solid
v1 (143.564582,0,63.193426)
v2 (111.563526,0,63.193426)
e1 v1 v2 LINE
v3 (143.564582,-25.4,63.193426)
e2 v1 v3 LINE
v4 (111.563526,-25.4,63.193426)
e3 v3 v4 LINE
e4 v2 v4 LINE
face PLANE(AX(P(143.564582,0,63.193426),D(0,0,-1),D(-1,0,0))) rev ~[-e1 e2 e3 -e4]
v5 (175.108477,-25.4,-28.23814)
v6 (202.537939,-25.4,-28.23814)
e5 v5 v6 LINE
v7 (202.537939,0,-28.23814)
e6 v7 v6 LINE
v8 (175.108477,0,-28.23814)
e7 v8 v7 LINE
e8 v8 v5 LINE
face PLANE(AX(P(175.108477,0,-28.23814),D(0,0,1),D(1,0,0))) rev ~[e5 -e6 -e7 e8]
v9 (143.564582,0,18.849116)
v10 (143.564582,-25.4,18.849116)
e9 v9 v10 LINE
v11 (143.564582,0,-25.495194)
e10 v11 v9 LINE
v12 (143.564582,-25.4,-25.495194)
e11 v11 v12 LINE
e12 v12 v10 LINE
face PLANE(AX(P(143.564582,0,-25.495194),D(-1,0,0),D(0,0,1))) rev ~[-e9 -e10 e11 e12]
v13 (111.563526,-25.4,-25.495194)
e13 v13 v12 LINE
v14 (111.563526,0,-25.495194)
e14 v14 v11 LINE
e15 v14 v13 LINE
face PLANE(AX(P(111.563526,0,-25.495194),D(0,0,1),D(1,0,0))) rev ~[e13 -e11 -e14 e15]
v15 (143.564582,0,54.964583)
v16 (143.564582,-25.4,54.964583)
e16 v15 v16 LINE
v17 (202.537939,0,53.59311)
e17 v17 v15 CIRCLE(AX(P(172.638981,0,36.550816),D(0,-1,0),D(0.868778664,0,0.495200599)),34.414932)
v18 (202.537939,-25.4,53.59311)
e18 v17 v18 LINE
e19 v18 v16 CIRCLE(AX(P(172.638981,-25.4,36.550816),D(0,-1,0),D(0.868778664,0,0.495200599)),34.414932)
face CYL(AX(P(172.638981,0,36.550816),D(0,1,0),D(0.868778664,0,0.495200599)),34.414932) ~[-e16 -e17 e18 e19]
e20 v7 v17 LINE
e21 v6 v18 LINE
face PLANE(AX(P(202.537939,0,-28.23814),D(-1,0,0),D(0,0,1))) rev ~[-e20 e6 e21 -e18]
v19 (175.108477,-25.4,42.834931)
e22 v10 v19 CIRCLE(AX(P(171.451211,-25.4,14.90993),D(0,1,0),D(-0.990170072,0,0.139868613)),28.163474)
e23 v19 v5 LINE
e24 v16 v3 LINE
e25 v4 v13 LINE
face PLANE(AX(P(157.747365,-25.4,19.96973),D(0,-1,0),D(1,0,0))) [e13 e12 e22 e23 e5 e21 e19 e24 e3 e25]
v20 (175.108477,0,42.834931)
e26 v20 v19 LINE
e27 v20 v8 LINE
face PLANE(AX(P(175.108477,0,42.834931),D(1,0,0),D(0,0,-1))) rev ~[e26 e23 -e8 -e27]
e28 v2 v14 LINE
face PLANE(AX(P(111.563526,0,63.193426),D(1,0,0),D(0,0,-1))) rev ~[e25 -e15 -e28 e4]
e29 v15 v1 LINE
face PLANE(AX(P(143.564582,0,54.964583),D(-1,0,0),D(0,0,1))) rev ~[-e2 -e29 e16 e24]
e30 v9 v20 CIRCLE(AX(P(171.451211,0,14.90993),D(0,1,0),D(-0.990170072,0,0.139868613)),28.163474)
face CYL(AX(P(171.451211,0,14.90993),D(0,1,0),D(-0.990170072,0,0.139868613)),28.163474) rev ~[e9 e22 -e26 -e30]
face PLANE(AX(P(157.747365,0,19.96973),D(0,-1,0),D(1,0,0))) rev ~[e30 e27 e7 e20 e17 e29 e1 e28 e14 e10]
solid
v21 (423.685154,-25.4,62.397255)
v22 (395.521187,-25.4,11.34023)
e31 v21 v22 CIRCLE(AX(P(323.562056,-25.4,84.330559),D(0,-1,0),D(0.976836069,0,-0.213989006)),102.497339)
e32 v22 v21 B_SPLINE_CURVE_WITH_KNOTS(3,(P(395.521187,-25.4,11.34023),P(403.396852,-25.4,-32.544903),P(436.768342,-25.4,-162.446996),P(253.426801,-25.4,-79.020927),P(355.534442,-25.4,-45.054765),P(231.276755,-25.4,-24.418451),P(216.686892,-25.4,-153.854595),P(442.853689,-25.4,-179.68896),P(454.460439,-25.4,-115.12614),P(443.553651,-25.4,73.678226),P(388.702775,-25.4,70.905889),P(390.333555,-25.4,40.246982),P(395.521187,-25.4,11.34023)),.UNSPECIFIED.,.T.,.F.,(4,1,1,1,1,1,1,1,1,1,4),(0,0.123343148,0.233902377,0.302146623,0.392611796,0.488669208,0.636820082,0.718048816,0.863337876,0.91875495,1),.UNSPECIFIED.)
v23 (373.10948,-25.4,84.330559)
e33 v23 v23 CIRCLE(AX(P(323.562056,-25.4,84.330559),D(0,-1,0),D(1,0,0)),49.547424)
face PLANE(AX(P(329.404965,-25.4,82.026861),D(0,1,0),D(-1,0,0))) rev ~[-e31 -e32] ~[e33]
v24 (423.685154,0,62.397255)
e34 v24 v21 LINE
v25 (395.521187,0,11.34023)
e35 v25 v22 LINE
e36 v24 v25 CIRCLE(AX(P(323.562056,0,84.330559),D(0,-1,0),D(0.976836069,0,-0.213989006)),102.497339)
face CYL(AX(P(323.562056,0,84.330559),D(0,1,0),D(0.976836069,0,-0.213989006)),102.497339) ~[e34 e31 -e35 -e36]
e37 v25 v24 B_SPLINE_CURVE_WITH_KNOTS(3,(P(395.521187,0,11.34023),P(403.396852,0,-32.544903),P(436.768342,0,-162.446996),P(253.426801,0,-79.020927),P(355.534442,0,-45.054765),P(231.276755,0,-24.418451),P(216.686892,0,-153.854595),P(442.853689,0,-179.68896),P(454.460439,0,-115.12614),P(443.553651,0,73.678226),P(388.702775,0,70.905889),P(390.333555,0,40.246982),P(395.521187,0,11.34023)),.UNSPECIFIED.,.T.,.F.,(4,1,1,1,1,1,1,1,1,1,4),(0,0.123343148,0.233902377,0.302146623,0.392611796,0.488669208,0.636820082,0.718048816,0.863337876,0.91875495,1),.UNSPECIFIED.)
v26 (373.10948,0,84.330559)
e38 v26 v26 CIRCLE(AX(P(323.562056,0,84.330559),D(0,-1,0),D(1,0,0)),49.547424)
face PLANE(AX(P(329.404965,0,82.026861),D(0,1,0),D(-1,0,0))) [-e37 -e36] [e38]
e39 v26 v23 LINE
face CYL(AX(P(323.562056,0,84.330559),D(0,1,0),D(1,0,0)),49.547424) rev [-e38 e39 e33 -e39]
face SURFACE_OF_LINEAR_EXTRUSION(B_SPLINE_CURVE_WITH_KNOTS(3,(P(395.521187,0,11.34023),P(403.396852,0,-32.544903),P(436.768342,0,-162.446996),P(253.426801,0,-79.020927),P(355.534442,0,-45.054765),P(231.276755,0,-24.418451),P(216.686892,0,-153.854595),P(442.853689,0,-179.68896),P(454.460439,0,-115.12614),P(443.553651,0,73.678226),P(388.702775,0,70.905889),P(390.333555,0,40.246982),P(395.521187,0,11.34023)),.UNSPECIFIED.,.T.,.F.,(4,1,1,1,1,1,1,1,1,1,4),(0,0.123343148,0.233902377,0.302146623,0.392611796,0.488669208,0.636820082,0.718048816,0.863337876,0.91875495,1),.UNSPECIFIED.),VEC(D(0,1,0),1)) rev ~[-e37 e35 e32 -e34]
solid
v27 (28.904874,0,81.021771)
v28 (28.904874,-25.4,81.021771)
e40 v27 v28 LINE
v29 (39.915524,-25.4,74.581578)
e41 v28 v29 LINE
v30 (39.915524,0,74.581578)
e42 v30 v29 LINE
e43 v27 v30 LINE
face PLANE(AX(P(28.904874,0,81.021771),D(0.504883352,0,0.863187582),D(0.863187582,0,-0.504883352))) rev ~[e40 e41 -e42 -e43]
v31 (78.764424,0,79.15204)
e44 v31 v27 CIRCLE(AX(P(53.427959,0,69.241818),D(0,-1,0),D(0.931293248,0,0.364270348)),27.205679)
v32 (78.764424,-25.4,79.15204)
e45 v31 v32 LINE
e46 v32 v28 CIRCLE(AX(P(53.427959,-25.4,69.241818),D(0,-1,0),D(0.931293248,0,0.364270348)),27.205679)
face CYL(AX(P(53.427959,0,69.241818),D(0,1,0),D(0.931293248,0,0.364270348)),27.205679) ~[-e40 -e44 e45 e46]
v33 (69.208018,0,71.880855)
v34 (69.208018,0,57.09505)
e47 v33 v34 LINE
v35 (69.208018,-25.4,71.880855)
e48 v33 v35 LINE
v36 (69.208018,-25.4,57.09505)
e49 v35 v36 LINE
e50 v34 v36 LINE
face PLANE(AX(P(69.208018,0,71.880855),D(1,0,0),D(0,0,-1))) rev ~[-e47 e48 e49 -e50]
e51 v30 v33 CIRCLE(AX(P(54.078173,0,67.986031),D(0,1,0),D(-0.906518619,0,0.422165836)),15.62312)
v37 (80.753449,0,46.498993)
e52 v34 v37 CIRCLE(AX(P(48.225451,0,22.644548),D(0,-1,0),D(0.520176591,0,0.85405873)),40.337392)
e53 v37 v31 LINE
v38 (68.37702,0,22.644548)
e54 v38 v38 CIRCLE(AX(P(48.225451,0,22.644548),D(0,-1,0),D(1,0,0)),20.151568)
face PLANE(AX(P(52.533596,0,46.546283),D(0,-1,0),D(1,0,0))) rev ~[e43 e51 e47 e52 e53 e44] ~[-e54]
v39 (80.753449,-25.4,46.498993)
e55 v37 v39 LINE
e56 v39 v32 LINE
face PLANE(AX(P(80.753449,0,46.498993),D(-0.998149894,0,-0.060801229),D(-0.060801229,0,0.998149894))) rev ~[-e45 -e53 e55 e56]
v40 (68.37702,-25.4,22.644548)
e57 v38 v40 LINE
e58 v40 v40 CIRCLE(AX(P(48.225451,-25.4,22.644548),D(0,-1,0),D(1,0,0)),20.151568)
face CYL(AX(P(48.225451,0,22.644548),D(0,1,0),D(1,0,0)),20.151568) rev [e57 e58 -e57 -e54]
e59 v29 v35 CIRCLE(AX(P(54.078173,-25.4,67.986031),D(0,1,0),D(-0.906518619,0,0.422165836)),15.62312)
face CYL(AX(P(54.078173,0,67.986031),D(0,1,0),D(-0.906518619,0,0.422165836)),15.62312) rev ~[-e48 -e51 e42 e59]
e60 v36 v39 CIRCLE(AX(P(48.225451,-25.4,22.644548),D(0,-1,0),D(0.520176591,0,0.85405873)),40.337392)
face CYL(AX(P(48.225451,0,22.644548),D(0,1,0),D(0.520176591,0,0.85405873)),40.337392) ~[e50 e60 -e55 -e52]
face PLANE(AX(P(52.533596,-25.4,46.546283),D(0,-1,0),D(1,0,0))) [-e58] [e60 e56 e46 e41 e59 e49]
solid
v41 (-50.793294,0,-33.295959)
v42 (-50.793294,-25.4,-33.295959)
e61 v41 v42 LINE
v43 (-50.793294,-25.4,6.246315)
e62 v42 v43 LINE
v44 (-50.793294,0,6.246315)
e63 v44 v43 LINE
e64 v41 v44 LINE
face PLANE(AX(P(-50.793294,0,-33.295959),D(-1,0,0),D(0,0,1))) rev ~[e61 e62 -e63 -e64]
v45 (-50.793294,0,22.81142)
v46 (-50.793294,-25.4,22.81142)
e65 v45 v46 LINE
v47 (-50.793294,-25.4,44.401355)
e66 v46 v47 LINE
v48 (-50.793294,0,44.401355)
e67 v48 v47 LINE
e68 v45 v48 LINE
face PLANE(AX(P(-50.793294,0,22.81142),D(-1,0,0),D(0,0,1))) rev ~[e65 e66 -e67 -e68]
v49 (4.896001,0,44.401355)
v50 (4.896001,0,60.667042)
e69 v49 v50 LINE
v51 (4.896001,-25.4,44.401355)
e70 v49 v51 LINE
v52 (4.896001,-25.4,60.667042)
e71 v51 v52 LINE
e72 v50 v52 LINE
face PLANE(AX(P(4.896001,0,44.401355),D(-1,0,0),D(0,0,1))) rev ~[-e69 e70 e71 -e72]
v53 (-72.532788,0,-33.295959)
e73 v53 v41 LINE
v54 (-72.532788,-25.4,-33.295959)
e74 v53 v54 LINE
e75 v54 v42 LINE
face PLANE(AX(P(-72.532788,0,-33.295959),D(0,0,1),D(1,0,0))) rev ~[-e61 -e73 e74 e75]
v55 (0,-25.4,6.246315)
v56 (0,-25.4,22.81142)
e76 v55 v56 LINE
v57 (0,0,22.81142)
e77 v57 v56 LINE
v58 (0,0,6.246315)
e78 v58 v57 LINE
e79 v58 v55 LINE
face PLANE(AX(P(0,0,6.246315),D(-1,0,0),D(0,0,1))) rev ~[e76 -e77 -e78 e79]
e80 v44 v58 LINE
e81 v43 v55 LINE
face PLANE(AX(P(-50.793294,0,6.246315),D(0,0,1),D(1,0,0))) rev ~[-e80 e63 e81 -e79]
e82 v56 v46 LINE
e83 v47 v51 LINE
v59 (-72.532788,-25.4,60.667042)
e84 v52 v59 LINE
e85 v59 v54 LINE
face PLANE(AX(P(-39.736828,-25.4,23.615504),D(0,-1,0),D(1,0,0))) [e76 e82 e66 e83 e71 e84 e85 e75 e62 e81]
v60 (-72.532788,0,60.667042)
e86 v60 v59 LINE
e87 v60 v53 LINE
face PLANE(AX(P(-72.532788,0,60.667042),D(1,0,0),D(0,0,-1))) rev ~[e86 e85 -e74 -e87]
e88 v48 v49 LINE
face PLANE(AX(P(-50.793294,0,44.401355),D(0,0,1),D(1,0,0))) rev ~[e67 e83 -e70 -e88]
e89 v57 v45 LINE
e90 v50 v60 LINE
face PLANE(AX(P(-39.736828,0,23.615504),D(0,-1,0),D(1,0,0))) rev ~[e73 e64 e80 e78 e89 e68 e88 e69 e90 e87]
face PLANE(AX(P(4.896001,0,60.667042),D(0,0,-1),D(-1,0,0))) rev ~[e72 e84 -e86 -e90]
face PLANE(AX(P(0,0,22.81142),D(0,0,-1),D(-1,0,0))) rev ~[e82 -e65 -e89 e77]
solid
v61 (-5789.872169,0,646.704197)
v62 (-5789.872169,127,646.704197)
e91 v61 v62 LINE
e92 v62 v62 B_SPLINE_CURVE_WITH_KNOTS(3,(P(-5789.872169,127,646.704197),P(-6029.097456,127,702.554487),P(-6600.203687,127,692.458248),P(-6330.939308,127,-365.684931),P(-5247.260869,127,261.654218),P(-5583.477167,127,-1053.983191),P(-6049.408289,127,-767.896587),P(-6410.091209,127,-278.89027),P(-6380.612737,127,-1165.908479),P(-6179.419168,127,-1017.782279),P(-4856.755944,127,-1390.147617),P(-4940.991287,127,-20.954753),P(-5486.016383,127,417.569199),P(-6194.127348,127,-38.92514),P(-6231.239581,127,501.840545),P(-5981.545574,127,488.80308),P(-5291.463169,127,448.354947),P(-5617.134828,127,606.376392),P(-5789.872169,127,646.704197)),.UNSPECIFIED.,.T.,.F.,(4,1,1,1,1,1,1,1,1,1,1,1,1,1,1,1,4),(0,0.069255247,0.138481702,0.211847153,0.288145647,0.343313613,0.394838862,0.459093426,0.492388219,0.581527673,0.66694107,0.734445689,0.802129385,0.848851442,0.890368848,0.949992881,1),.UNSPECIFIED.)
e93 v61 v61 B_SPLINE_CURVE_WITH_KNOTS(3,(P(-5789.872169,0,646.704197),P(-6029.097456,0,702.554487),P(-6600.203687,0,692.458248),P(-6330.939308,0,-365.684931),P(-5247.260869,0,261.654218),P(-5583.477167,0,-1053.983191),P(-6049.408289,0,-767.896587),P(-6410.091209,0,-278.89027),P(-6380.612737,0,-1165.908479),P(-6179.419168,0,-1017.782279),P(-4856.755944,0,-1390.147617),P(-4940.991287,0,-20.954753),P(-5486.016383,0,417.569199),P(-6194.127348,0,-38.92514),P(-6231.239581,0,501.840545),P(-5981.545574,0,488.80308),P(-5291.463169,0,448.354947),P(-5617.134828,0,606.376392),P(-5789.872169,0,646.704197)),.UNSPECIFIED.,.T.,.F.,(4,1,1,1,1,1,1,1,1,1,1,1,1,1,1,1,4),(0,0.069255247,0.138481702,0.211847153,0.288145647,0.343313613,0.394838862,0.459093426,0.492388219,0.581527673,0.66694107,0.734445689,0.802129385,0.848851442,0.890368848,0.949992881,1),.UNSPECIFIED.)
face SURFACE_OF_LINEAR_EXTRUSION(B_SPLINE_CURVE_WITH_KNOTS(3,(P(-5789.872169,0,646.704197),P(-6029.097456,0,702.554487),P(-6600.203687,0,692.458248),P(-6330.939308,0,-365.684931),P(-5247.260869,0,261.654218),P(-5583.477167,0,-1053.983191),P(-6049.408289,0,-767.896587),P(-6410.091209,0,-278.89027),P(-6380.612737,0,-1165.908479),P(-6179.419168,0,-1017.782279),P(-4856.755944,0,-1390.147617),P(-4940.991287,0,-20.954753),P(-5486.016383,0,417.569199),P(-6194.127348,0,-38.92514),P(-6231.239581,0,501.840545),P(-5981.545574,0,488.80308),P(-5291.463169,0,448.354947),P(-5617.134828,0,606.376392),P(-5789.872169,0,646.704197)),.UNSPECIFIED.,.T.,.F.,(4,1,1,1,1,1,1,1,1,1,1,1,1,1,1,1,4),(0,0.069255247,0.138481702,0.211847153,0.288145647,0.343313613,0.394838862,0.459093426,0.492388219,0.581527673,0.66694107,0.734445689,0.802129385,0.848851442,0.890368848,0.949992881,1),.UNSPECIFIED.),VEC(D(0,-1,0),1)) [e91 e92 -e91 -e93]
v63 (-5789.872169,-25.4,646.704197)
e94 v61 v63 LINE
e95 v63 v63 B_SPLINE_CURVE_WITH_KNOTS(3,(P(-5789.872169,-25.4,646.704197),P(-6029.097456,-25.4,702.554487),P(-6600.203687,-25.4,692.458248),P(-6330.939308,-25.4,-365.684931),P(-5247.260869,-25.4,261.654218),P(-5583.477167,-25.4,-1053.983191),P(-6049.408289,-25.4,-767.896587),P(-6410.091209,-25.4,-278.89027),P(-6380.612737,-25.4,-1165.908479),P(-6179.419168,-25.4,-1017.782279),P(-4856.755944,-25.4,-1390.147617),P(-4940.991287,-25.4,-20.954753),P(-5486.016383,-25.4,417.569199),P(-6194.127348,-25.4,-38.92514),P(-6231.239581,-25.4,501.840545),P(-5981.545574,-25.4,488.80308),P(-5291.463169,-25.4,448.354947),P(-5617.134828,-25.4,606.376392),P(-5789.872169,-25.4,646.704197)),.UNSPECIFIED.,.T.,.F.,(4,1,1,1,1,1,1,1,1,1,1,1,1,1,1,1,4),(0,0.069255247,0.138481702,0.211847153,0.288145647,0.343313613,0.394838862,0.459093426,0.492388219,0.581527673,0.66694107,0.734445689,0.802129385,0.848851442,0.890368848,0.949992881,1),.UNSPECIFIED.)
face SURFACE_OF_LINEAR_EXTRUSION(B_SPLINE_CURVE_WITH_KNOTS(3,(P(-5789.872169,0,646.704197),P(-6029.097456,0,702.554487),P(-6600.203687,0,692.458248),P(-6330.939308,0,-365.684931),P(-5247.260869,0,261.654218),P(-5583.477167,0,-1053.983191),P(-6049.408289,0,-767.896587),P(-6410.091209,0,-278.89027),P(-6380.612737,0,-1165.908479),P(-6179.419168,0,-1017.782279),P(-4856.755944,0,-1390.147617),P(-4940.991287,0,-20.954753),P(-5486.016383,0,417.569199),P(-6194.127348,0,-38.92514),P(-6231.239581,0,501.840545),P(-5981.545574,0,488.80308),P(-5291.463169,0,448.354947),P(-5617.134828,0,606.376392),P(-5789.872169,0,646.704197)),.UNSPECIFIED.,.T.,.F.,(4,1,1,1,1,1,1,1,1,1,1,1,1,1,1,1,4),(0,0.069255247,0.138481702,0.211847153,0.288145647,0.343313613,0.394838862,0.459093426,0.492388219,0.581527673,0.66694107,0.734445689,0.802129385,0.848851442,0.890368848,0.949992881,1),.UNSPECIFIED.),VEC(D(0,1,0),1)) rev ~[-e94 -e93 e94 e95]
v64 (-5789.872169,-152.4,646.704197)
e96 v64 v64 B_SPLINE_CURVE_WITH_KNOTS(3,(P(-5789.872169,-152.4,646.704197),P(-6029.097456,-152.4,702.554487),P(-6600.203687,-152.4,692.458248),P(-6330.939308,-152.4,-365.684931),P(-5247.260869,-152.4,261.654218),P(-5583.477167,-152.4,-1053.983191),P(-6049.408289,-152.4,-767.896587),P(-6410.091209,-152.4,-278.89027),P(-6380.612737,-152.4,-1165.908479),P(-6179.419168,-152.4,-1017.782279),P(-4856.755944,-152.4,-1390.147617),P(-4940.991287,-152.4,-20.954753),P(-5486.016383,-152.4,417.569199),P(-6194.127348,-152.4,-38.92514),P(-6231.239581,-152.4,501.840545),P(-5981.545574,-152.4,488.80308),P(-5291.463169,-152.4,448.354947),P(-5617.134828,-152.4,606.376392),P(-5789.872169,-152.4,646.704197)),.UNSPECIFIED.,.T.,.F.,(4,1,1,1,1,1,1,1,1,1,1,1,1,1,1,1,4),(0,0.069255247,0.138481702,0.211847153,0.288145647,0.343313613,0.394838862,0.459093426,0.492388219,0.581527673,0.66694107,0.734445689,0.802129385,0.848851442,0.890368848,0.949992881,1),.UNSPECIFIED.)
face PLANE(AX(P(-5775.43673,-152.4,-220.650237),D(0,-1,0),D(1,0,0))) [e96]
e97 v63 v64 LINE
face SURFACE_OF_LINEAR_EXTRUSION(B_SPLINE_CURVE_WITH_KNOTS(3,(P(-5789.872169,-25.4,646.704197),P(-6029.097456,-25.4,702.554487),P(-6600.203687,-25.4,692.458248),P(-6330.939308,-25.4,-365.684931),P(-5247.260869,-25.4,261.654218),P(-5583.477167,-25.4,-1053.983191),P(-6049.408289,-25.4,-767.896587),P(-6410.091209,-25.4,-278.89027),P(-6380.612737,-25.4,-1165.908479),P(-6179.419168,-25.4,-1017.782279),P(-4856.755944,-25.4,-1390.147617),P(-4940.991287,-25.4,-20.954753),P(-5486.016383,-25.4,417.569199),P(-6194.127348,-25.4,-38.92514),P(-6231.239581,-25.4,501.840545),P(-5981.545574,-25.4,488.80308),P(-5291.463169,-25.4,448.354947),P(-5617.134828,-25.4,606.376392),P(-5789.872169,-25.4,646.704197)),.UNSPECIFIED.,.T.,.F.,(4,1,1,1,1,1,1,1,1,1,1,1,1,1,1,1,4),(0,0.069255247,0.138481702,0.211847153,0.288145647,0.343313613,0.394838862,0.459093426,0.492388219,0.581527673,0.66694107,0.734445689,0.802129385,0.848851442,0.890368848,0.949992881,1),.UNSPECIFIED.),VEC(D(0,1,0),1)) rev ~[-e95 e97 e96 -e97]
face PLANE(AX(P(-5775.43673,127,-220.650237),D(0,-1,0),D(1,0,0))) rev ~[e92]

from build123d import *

# Parameters (mm, degrees)
F1_DEPTH  = 25.4
F2_R      = 20.1515683271
F3_DEPTH  = 25.4
F5_DEPTH  = 25.4
F6_R      = 49.5474241776
F7_DEPTH  = 25.4
F9_DEPTH  = 25.4
F10_DEPTH = 127
F11_DEPTH = 127


with BuildPart() as f1:
    # F0 (on Front) → F1 (new body)
    with BuildSketch(Plane.XZ):
        Polygon((4.896000959, 60.6670416892), (-50.7932938635, 60.6670416892), (-72.532787919, 60.6670416892), (-72.532787919, -33.2959592342), (-50.7932938635, -33.2959592342), (-50.7932938635, 6.2463153154), (0, 6.2463153154), (0, 22.8114202619), (-50.7932938635, 22.8114202619), (-50.7932938635, 44.4013550878), (4.896000959, 44.4013550878), align=None)
    extrude(amount=F1_DEPTH)


with BuildPart() as f3:
    # F2 (on Front) → F3 (new body)
    with BuildSketch(Plane.XZ):
        with BuildLine():
            Line((69.2080184817, 71.8808546662), (69.2080184817, 57.0950497716))
            ThreePointArc((69.2080184817, 57.0950497716), (20.9506599051, -7.0739813824), (80.7534490159, 46.4989934334))
            Line((80.7534490159, 46.4989934334), (78.764423728, 79.1520401835))
            ThreePointArc((78.764423728, 79.1520401835), (54.4474535963, 96.4283882368), (28.9048738778, 81.0217708349))
            Line((28.9048738778, 81.0217708349), (39.9155244231, 74.5815783739))
            ThreePointArc((39.9155244231, 74.5815783739), (55.5125178382, 83.5431683785), (69.2080184817, 71.8808546662))
        make_face()
        with Locations((48.2254512608, 22.6445477456)):
            Circle(F2_R, mode=Mode.SUBTRACT)
    extrude(amount=F3_DEPTH)


with BuildPart() as f5:
    # F4 (on Front) → F5 (new body)
    with BuildSketch(Plane.XZ):
        with BuildLine():
            Line((143.564581871, 63.1934255362), (111.563526094, 63.1934255362))
            Line((111.563526094, 63.1934255362), (111.563526094, -25.4951938987))
            Line((111.563526094, -25.4951938987), (143.564581871, -25.4951938987))
            Line((143.564581871, -25.4951938987), (143.564581871, 18.8491158187))
            ThreePointArc((143.564581871, 18.8491158187), (154.4043540585, 37.3283583229), (175.1084774733, 42.834930599))
            Line((175.1084774733, 42.834930599), (175.1084774733, -28.2381400466))
            Line((175.1084774733, -28.2381400466), (202.5379389524, -28.2381400466))
            Line((202.5379389524, -28.2381400466), (202.5379389524, 53.5931102931))
            ThreePointArc((202.5379389524, 53.5931102931), (173.4391114232, 70.9564445373), (143.564581871, 54.9645833671))
            Line((143.564581871, 54.9645833671), (143.564581871, 63.1934255362))
        make_face()
    extrude(amount=F5_DEPTH)


with BuildPart() as f7:
    # F6 (on Front) → F7 (new body)
    with BuildSketch(Plane.XZ):
        with BuildLine():
            add(Edge.make_bspline(
                [(423.6851538527, 62.3972549785), (415.2890698824, 72.249644405), (388.7027752218, 70.9058885795), (390.3335545605, 40.2469822597), (395.5211865422, 11.3402300988)],
                knots=[0.863337876, 0.863337876, 0.863337876, 0.863337876, 0.9187549499, 1, 1, 1, 1], degree=3))
            ThreePointArc((423.6851538527, 62.3972549785), (233.8136390734, 133.8373892581), (395.5211865422, 11.3402300988))
        make_face()
        with Locations((323.5620558262, 84.3305587769)):
            Circle(F6_R, mode=Mode.SUBTRACT)
        with BuildLine():
            add(Edge.make_bspline(
                [(395.5211865422, 11.3402300988), (403.3968523027, -32.5449026633), (436.7683420202, -162.4469960687), (253.4268012825, -79.0209266907), (355.534441953, -45.0547650507), (231.2767549114, -24.4184514926), (216.6868917952, -153.8545946428), (442.8536893784, -179.6889597751), (454.4604391253, -115.1261400281), (445.6974879499, 36.5668692321), (423.6851538527, 62.3972549785)],
                knots=[0, 0, 0, 0, 0.123343148, 0.2339023765, 0.3021466231, 0.3926117963, 0.4886692082, 0.6368200822, 0.7180488163, 0.863337876, 0.863337876, 0.863337876, 0.863337876], degree=3))
            add(Edge.make_bspline(
                [(423.6851538527, 62.3972549785), (415.2890698824, 72.249644405), (388.7027752218, 70.9058885795), (390.3335545605, 40.2469822597), (395.5211865422, 11.3402300988)],
                knots=[0.863337876, 0.863337876, 0.863337876, 0.863337876, 0.9187549499, 1, 1, 1, 1], degree=3))
        make_face()
    extrude(amount=F7_DEPTH)


with BuildPart() as f9:
    # F8 (on Front) → F9 (new body)
    with BuildSketch(Plane.XZ):
        with BuildLine():
            add(Edge.make_bspline(
                [(-5789.8721694946, 646.7041969299), (-6029.0974564563, 702.5544866781), (-6600.2036870222, 692.4582475207), (-6330.9393082426, -365.6849305228), (-5247.260869054, 261.6542176688), (-5583.4771670994, -1053.983190959), (-6049.4082894386, -767.8965865714), (-6410.0912093828, -278.890270212), (-6380.6127365378, -1165.9084787937), (-6179.4191681434, -1017.7822785815), (-4856.7559437472, -1390.1476170648), (-4940.9912866156, -20.9547533999), (-5486.0163828131, 417.5691986973), (-6194.1273480798, -38.9251401465), (-6231.23958143, 501.8405446254), (-5981.5455739721, 488.8030796811), (-5291.4631694677, 448.3549468047), (-5617.1348275726, 606.3763924607), (-5789.8721694946, 646.7041969299)],
                knots=[0, 0, 0, 0, 0.0692552473, 0.1384817025, 0.2118471534, 0.2881456467, 0.3433136131, 0.3948388618, 0.4590934257, 0.4923882186, 0.5815276731, 0.6669410696, 0.7344456887, 0.8021293852, 0.8488514416, 0.8903688476, 0.9499928813, 1, 1, 1, 1], degree=3))
        make_face()
    extrude(amount=F9_DEPTH)

    # F10 (add): a face of the model
    f10_faces = [f9.faces().sort_by_distance(p)[0] for p in [
        (-6050.0786856326, -25.4, -1069.7615712913),
    ]]
    extrude(f10_faces, amount=F10_DEPTH)

    # F11 (add): a face of the model
    f11_faces = [f9.faces().sort_by_distance(p)[0] for p in [
        (-6050.0786856326, 0, -1069.7615712913),
    ]]
    extrude(f11_faces, amount=F11_DEPTH)


solid = Compound([f1.part, f3.part, f5.part, f7.part, f9.part])
